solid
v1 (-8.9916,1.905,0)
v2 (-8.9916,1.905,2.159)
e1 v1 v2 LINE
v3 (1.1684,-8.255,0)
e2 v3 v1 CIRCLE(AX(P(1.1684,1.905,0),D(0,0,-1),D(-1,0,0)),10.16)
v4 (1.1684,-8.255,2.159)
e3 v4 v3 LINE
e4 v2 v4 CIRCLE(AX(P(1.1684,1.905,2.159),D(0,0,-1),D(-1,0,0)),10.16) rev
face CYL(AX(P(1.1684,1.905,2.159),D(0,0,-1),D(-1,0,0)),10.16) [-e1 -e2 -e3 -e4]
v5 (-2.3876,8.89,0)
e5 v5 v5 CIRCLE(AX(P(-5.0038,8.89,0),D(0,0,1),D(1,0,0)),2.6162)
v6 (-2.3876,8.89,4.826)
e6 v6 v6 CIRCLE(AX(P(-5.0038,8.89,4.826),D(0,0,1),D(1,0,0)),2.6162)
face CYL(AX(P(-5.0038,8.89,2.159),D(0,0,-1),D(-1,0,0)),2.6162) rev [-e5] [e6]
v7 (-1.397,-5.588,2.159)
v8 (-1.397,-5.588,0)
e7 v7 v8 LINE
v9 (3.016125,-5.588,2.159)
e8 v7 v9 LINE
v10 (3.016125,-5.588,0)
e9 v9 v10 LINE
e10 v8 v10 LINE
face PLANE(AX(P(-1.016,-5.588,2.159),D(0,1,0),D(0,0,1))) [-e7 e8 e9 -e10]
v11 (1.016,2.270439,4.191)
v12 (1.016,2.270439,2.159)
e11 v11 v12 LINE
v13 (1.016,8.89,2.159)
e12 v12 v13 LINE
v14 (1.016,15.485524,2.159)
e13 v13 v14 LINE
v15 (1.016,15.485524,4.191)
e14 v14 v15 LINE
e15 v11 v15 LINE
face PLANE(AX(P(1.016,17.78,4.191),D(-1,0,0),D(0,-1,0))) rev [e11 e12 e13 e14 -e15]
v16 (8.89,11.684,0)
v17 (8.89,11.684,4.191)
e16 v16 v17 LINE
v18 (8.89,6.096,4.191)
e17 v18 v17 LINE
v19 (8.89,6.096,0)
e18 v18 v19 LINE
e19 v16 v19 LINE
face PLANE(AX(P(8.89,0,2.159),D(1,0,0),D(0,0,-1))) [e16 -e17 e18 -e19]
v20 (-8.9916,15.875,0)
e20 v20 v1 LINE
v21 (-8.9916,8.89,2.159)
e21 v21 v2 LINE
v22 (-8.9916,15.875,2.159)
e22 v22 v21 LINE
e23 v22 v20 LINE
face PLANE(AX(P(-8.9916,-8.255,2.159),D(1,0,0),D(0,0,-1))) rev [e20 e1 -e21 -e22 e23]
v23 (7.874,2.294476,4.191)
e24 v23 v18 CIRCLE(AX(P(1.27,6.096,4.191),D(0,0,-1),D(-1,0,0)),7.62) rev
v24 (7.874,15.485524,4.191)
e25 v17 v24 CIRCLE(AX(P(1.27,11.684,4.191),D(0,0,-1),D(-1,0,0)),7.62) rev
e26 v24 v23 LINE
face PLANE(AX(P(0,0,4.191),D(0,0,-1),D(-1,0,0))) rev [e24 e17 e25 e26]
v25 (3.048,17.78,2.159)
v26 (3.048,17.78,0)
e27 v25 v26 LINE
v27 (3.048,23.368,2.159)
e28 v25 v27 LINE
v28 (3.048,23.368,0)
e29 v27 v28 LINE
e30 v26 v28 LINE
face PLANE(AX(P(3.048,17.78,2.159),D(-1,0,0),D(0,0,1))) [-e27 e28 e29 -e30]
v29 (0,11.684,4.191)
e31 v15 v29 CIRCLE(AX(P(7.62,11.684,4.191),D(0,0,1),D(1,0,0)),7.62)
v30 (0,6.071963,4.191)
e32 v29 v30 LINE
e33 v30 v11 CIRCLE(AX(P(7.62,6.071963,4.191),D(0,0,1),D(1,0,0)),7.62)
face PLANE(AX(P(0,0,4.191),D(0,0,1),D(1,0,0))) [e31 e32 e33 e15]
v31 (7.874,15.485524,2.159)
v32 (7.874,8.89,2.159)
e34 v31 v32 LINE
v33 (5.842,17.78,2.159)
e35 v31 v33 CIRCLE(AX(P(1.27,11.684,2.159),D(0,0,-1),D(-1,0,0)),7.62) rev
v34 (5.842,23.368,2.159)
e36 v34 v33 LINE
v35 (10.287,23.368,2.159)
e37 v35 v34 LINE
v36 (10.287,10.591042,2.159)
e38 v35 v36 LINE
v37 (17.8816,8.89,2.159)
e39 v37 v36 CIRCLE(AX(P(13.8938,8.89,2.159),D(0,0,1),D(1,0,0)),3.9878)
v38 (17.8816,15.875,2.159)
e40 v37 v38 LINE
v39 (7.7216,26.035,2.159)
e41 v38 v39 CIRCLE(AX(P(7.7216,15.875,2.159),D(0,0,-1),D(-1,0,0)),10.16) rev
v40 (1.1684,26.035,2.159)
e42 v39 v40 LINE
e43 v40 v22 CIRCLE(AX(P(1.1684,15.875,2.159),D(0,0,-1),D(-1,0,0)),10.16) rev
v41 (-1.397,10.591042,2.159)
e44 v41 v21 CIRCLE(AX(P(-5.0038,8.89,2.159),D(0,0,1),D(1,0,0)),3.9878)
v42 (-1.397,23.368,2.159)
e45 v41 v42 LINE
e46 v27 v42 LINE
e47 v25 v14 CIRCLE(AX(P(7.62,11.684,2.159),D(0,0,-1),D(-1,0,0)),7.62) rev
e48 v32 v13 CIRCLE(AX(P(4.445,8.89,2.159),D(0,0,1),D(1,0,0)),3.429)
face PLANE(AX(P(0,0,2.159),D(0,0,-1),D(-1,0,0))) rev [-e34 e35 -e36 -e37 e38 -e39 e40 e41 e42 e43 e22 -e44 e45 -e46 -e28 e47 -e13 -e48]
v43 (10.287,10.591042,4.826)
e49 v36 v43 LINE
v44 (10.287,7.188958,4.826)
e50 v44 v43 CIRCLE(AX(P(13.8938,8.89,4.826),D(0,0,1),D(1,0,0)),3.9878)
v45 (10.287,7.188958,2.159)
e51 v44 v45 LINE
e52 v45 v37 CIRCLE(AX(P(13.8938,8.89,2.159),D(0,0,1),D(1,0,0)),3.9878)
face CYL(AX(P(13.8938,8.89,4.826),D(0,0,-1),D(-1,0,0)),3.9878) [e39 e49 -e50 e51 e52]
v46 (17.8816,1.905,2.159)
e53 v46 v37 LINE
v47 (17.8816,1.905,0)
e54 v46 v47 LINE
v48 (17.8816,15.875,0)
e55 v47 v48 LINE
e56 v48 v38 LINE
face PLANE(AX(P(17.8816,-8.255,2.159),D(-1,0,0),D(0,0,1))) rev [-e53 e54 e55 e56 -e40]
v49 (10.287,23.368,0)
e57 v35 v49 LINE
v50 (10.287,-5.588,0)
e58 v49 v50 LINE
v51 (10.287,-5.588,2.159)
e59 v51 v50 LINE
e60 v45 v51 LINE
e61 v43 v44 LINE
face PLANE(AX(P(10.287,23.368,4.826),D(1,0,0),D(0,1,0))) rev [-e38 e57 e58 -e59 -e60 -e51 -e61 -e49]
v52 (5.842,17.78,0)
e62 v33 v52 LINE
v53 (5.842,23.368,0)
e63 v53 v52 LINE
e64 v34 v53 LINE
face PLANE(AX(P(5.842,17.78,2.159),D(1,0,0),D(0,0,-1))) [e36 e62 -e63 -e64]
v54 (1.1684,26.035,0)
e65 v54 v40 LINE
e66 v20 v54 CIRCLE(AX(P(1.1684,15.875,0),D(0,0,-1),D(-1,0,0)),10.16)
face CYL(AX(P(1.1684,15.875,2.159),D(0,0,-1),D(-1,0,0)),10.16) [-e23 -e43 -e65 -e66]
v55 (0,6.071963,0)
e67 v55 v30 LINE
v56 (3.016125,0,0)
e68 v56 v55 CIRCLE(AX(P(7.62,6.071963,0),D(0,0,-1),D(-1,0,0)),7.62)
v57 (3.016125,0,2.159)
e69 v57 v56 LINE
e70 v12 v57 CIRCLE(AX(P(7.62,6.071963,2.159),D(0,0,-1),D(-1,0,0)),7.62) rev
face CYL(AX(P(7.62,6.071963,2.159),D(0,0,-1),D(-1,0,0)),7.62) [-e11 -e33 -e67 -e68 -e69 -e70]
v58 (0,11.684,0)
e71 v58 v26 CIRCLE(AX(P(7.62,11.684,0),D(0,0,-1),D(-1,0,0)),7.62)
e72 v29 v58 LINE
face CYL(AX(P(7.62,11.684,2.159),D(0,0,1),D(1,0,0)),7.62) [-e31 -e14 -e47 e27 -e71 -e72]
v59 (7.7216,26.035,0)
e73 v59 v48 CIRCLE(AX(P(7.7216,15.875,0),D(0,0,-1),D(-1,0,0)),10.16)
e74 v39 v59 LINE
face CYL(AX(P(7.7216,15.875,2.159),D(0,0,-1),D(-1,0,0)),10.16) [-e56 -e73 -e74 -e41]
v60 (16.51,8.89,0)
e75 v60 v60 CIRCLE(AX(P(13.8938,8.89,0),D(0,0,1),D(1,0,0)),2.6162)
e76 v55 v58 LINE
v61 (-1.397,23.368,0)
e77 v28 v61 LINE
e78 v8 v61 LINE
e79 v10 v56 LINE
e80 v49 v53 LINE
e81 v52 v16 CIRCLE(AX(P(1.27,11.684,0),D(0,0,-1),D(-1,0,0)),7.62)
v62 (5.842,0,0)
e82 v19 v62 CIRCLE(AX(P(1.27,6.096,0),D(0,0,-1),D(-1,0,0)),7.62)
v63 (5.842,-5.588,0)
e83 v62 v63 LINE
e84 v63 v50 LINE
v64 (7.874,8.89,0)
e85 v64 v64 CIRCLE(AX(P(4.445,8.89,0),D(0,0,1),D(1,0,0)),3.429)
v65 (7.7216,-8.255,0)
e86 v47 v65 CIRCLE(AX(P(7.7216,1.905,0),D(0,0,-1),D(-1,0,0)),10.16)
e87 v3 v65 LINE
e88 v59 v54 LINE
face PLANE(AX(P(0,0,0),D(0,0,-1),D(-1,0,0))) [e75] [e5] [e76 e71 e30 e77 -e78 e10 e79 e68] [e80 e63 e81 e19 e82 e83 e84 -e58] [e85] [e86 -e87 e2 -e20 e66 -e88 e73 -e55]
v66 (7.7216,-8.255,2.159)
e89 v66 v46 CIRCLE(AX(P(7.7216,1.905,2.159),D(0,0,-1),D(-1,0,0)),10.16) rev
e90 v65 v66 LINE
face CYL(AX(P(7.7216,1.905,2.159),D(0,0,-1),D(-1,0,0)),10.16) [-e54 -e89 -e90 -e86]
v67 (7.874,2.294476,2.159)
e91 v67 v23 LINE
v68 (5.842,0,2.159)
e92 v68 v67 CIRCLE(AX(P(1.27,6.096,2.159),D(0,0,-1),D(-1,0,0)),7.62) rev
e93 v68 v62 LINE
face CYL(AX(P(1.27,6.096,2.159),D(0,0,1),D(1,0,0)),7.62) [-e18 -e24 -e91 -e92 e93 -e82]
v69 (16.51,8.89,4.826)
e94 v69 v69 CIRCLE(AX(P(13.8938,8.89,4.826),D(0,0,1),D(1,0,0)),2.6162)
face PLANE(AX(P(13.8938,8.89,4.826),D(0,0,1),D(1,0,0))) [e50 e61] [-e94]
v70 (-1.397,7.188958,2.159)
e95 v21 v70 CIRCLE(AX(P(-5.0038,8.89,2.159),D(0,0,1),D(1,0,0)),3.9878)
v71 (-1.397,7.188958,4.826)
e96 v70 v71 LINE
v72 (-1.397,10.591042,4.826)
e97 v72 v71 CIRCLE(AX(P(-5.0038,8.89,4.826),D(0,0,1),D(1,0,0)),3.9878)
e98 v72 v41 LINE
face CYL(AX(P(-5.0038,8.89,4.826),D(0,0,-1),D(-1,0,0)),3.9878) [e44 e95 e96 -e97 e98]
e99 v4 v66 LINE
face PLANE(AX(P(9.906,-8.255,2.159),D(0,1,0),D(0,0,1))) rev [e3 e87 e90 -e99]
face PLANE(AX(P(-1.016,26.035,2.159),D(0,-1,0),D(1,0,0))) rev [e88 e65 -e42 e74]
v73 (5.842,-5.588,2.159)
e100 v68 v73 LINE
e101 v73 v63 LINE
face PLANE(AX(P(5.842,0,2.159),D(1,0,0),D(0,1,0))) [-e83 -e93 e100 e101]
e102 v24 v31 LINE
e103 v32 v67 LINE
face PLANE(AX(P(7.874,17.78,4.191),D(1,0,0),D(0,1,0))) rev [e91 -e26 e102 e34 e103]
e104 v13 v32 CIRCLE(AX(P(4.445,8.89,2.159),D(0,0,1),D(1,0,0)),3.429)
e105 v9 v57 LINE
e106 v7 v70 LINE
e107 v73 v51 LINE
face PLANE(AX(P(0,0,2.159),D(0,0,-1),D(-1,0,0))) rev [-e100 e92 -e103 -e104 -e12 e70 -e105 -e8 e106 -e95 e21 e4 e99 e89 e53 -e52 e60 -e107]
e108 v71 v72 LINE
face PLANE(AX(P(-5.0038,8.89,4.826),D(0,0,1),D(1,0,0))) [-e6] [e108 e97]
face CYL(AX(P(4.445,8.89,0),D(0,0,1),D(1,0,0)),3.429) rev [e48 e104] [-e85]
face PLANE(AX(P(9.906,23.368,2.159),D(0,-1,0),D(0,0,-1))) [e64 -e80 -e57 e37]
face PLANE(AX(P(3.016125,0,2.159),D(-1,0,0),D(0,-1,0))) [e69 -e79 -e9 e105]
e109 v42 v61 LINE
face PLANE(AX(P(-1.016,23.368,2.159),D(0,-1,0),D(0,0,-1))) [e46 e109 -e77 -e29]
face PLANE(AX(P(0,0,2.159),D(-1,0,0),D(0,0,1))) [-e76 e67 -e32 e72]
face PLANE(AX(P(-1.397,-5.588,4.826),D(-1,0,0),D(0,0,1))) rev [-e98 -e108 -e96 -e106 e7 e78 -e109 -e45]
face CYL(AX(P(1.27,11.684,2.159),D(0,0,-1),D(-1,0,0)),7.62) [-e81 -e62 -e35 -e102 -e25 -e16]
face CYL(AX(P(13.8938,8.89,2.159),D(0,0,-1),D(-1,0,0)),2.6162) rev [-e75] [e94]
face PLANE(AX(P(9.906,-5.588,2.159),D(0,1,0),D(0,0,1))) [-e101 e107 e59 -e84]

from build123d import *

# Parameters (mm, degrees)
SKETCH1_R           = 2.6162
BOSS_EXTRUDE1_DEPTH = 2.159
SKETCH2_R           = 3.429
CUT_EXTRUDE1_DEPTH  = 32.658081505
FILLET1_R           = 10.16
SKETCH3_W           = 1.016
SKETCH3_H           = 17.78
BOSS_EXTRUDE2_DEPTH = 2.032
SKETCH4_R           = 3.9878
SKETCH4_R_2         = 2.6162
BOSS_EXTRUDE3_DEPTH = 2.667
FILLET2_R           = 7.62
SKETCH6_W           = 0.381
SKETCH6_H           = 28.956
CUT_EXTRUDE2_DEPTH  = 32.950948649


with BuildPart() as part:
    # Sketch1 → Boss-Extrude1 (new body)
    with BuildSketch(Plane.XY):
        Polygon((-1.016, -8.255), (-8.9916, -8.255), (-8.9916, 26.035), (-1.016, 26.035), (9.906, 26.035), (17.8816, 26.035), (17.8816, -8.255), (9.906, -8.255), align=None)
        with Locations((13.8938, 8.89)):
            Circle(SKETCH1_R, mode=Mode.SUBTRACT)
        with Locations((-5.0038, 8.89)):
            Circle(SKETCH1_R, mode=Mode.SUBTRACT)
        Polygon((0, 0), (0, 17.78), (3.048, 17.78), (3.048, 23.368), (-1.016, 23.368), (-1.016, 18.288), (-1.016, 0.508), (-1.016, -5.588), (3.016124998, -5.588), (3.016124998, 0), align=None, mode=Mode.SUBTRACT)
        Polygon((8.89, 0), (8.89, 17.78), (5.842, 17.78), (5.842, 23.368), (9.906, 23.368), (9.906, 17.78), (9.906, 0), (9.906, -5.588), (5.842, -5.588), (5.842, 0), align=None, mode=Mode.SUBTRACT)
    extrude(amount=BOSS_EXTRUDE1_DEPTH)

    # Sketch2 → Cut-Extrude1 (cut, through all)
    with BuildSketch(Plane.XY.offset(2.159)):
        with Locations((4.445, 8.89)):
            Circle(SKETCH2_R)
    extrude(amount=-CUT_EXTRUDE1_DEPTH, mode=Mode.SUBTRACT)

    # Fillet1
    fillet1_edges = [part.edges().sort_by_distance(p)[0] for p in [
        (17.8816, -8.255, 1.0795),
        (-8.9916, -8.255, 1.0795),
        (-8.9916, 26.035, 1.0795),
        (17.8816, 26.035, 1.0795),
    ]]
    fillet(fillet1_edges, radius=FILLET1_R)

    # Sketch3 → Boss-Extrude2 (add)
    with BuildSketch(Plane.XY.offset(2.159)):
        with Locations((0.508, 8.89)):
            Rectangle(SKETCH3_W, SKETCH3_H)
        with Locations((8.382, 8.89)):
            Rectangle(SKETCH3_W, SKETCH3_H)
    extrude(amount=BOSS_EXTRUDE2_DEPTH)

    # Sketch4 → Boss-Extrude3 (add)
    # profile 1 of 2: a face of its own
    with BuildSketch(Plane.XY.offset(2.159)):
        with Locations((-5.0038, 8.89)):
            Circle(SKETCH4_R)
        with Locations((-5.0038, 8.89)):
            Circle(SKETCH4_R_2, mode=Mode.SUBTRACT)
    # profile 2 of 2: a face of its own
    with BuildSketch(Plane.XY.offset(2.159)):
        with Locations((13.8938, 8.89)):
            Circle(SKETCH4_R)
        with Locations((13.8938, 8.89)):
            Circle(SKETCH4_R_2, mode=Mode.SUBTRACT)
    extrude(amount=BOSS_EXTRUDE3_DEPTH)

    # Fillet2
    # the kernel refuses this fillet: 7.62 mm, written as the material it takes off along each edge
    with BuildSketch(Plane(origin=(8.89, 0, -15.24), x_dir=(0, 1, 0), z_dir=(0, 0, 1))) as fillet2_piece_1:
        with BuildLine():
            CenterArc((6.096, 7.62), FILLET2_R, 216.869897646, 53.130102354)
            Line((0, 3.048), (-0.12192, 2.95656))
            ThreePointArc((-0.12192, 2.95656), (-0.1524, 1.524), (-0.1524, 0))
            Line((-0.1524, 0), (0, -0.1524))
            Line((0, -0.1524), (6.096, -0.1524))
            Line((6.096, -0.1524), (6.096, 0))
        make_face()
    extrude(amount=34.671, mode=Mode.SUBTRACT)
    with BuildSketch(Plane(origin=(0, 0, -15.17990756), x_dir=(0, 1, 0), z_dir=(0, 0, 1))) as fillet2_piece_2:
        with BuildLine():
            CenterArc((6.071963024, -7.62), FILLET2_R, 90, 52.82992082)
            Line((0, -3.016124998), (-0.12143926, -2.924047498))
            ThreePointArc((-0.12143926, -2.924047498), (-0.1524, -1.508062499), (-0.1524, 0))
            Line((-0.1524, 0), (0, 0.1524))
            Line((0, 0.1524), (6.071963024, 0.1524))
            Line((6.071963024, 0.1524), (6.071963024, 0))
        make_face()
    extrude(amount=34.550815121, mode=Mode.SUBTRACT)
    with BuildSketch(Plane(origin=(0, 17.78, 19.431), x_dir=(1, 0, 0), z_dir=(0, 0, -1)), Plane(origin=(8.89, 17.78, -15.24), x_dir=(-1, 0, 0), z_dir=(0, 0, 1))) as fillet2_piece_3:
        with BuildLine():
            CenterArc((7.62, 6.096), FILLET2_R, 180, 53.130102354)
            Line((0, 6.096), (-0.1524, 6.096))
            Line((-0.1524, 6.096), (-0.1524, 0))
            Line((-0.1524, 0), (0, -0.1524))
            ThreePointArc((0, -0.1524), (1.524, -0.1524), (2.95656, -0.12192))
            Line((2.95656, -0.12192), (3.048, 0))
        make_face()
    extrude(amount=34.671, mode=Mode.SUBTRACT)

    # Sketch6 → Cut-Extrude2 (cut, through all)
    with BuildSketch(Plane(origin=(0, 0, 0), x_dir=(-1, 0, 0), z_dir=(0, 0, -1))):
        with Locations((1.2065, 8.89)):
            Rectangle(SKETCH6_W, SKETCH6_H)
        with Locations((-10.0965, 8.89)):
            Rectangle(SKETCH6_W, SKETCH6_H)
    extrude(amount=-CUT_EXTRUDE2_DEPTH, mode=Mode.SUBTRACT)


solid = part.part
